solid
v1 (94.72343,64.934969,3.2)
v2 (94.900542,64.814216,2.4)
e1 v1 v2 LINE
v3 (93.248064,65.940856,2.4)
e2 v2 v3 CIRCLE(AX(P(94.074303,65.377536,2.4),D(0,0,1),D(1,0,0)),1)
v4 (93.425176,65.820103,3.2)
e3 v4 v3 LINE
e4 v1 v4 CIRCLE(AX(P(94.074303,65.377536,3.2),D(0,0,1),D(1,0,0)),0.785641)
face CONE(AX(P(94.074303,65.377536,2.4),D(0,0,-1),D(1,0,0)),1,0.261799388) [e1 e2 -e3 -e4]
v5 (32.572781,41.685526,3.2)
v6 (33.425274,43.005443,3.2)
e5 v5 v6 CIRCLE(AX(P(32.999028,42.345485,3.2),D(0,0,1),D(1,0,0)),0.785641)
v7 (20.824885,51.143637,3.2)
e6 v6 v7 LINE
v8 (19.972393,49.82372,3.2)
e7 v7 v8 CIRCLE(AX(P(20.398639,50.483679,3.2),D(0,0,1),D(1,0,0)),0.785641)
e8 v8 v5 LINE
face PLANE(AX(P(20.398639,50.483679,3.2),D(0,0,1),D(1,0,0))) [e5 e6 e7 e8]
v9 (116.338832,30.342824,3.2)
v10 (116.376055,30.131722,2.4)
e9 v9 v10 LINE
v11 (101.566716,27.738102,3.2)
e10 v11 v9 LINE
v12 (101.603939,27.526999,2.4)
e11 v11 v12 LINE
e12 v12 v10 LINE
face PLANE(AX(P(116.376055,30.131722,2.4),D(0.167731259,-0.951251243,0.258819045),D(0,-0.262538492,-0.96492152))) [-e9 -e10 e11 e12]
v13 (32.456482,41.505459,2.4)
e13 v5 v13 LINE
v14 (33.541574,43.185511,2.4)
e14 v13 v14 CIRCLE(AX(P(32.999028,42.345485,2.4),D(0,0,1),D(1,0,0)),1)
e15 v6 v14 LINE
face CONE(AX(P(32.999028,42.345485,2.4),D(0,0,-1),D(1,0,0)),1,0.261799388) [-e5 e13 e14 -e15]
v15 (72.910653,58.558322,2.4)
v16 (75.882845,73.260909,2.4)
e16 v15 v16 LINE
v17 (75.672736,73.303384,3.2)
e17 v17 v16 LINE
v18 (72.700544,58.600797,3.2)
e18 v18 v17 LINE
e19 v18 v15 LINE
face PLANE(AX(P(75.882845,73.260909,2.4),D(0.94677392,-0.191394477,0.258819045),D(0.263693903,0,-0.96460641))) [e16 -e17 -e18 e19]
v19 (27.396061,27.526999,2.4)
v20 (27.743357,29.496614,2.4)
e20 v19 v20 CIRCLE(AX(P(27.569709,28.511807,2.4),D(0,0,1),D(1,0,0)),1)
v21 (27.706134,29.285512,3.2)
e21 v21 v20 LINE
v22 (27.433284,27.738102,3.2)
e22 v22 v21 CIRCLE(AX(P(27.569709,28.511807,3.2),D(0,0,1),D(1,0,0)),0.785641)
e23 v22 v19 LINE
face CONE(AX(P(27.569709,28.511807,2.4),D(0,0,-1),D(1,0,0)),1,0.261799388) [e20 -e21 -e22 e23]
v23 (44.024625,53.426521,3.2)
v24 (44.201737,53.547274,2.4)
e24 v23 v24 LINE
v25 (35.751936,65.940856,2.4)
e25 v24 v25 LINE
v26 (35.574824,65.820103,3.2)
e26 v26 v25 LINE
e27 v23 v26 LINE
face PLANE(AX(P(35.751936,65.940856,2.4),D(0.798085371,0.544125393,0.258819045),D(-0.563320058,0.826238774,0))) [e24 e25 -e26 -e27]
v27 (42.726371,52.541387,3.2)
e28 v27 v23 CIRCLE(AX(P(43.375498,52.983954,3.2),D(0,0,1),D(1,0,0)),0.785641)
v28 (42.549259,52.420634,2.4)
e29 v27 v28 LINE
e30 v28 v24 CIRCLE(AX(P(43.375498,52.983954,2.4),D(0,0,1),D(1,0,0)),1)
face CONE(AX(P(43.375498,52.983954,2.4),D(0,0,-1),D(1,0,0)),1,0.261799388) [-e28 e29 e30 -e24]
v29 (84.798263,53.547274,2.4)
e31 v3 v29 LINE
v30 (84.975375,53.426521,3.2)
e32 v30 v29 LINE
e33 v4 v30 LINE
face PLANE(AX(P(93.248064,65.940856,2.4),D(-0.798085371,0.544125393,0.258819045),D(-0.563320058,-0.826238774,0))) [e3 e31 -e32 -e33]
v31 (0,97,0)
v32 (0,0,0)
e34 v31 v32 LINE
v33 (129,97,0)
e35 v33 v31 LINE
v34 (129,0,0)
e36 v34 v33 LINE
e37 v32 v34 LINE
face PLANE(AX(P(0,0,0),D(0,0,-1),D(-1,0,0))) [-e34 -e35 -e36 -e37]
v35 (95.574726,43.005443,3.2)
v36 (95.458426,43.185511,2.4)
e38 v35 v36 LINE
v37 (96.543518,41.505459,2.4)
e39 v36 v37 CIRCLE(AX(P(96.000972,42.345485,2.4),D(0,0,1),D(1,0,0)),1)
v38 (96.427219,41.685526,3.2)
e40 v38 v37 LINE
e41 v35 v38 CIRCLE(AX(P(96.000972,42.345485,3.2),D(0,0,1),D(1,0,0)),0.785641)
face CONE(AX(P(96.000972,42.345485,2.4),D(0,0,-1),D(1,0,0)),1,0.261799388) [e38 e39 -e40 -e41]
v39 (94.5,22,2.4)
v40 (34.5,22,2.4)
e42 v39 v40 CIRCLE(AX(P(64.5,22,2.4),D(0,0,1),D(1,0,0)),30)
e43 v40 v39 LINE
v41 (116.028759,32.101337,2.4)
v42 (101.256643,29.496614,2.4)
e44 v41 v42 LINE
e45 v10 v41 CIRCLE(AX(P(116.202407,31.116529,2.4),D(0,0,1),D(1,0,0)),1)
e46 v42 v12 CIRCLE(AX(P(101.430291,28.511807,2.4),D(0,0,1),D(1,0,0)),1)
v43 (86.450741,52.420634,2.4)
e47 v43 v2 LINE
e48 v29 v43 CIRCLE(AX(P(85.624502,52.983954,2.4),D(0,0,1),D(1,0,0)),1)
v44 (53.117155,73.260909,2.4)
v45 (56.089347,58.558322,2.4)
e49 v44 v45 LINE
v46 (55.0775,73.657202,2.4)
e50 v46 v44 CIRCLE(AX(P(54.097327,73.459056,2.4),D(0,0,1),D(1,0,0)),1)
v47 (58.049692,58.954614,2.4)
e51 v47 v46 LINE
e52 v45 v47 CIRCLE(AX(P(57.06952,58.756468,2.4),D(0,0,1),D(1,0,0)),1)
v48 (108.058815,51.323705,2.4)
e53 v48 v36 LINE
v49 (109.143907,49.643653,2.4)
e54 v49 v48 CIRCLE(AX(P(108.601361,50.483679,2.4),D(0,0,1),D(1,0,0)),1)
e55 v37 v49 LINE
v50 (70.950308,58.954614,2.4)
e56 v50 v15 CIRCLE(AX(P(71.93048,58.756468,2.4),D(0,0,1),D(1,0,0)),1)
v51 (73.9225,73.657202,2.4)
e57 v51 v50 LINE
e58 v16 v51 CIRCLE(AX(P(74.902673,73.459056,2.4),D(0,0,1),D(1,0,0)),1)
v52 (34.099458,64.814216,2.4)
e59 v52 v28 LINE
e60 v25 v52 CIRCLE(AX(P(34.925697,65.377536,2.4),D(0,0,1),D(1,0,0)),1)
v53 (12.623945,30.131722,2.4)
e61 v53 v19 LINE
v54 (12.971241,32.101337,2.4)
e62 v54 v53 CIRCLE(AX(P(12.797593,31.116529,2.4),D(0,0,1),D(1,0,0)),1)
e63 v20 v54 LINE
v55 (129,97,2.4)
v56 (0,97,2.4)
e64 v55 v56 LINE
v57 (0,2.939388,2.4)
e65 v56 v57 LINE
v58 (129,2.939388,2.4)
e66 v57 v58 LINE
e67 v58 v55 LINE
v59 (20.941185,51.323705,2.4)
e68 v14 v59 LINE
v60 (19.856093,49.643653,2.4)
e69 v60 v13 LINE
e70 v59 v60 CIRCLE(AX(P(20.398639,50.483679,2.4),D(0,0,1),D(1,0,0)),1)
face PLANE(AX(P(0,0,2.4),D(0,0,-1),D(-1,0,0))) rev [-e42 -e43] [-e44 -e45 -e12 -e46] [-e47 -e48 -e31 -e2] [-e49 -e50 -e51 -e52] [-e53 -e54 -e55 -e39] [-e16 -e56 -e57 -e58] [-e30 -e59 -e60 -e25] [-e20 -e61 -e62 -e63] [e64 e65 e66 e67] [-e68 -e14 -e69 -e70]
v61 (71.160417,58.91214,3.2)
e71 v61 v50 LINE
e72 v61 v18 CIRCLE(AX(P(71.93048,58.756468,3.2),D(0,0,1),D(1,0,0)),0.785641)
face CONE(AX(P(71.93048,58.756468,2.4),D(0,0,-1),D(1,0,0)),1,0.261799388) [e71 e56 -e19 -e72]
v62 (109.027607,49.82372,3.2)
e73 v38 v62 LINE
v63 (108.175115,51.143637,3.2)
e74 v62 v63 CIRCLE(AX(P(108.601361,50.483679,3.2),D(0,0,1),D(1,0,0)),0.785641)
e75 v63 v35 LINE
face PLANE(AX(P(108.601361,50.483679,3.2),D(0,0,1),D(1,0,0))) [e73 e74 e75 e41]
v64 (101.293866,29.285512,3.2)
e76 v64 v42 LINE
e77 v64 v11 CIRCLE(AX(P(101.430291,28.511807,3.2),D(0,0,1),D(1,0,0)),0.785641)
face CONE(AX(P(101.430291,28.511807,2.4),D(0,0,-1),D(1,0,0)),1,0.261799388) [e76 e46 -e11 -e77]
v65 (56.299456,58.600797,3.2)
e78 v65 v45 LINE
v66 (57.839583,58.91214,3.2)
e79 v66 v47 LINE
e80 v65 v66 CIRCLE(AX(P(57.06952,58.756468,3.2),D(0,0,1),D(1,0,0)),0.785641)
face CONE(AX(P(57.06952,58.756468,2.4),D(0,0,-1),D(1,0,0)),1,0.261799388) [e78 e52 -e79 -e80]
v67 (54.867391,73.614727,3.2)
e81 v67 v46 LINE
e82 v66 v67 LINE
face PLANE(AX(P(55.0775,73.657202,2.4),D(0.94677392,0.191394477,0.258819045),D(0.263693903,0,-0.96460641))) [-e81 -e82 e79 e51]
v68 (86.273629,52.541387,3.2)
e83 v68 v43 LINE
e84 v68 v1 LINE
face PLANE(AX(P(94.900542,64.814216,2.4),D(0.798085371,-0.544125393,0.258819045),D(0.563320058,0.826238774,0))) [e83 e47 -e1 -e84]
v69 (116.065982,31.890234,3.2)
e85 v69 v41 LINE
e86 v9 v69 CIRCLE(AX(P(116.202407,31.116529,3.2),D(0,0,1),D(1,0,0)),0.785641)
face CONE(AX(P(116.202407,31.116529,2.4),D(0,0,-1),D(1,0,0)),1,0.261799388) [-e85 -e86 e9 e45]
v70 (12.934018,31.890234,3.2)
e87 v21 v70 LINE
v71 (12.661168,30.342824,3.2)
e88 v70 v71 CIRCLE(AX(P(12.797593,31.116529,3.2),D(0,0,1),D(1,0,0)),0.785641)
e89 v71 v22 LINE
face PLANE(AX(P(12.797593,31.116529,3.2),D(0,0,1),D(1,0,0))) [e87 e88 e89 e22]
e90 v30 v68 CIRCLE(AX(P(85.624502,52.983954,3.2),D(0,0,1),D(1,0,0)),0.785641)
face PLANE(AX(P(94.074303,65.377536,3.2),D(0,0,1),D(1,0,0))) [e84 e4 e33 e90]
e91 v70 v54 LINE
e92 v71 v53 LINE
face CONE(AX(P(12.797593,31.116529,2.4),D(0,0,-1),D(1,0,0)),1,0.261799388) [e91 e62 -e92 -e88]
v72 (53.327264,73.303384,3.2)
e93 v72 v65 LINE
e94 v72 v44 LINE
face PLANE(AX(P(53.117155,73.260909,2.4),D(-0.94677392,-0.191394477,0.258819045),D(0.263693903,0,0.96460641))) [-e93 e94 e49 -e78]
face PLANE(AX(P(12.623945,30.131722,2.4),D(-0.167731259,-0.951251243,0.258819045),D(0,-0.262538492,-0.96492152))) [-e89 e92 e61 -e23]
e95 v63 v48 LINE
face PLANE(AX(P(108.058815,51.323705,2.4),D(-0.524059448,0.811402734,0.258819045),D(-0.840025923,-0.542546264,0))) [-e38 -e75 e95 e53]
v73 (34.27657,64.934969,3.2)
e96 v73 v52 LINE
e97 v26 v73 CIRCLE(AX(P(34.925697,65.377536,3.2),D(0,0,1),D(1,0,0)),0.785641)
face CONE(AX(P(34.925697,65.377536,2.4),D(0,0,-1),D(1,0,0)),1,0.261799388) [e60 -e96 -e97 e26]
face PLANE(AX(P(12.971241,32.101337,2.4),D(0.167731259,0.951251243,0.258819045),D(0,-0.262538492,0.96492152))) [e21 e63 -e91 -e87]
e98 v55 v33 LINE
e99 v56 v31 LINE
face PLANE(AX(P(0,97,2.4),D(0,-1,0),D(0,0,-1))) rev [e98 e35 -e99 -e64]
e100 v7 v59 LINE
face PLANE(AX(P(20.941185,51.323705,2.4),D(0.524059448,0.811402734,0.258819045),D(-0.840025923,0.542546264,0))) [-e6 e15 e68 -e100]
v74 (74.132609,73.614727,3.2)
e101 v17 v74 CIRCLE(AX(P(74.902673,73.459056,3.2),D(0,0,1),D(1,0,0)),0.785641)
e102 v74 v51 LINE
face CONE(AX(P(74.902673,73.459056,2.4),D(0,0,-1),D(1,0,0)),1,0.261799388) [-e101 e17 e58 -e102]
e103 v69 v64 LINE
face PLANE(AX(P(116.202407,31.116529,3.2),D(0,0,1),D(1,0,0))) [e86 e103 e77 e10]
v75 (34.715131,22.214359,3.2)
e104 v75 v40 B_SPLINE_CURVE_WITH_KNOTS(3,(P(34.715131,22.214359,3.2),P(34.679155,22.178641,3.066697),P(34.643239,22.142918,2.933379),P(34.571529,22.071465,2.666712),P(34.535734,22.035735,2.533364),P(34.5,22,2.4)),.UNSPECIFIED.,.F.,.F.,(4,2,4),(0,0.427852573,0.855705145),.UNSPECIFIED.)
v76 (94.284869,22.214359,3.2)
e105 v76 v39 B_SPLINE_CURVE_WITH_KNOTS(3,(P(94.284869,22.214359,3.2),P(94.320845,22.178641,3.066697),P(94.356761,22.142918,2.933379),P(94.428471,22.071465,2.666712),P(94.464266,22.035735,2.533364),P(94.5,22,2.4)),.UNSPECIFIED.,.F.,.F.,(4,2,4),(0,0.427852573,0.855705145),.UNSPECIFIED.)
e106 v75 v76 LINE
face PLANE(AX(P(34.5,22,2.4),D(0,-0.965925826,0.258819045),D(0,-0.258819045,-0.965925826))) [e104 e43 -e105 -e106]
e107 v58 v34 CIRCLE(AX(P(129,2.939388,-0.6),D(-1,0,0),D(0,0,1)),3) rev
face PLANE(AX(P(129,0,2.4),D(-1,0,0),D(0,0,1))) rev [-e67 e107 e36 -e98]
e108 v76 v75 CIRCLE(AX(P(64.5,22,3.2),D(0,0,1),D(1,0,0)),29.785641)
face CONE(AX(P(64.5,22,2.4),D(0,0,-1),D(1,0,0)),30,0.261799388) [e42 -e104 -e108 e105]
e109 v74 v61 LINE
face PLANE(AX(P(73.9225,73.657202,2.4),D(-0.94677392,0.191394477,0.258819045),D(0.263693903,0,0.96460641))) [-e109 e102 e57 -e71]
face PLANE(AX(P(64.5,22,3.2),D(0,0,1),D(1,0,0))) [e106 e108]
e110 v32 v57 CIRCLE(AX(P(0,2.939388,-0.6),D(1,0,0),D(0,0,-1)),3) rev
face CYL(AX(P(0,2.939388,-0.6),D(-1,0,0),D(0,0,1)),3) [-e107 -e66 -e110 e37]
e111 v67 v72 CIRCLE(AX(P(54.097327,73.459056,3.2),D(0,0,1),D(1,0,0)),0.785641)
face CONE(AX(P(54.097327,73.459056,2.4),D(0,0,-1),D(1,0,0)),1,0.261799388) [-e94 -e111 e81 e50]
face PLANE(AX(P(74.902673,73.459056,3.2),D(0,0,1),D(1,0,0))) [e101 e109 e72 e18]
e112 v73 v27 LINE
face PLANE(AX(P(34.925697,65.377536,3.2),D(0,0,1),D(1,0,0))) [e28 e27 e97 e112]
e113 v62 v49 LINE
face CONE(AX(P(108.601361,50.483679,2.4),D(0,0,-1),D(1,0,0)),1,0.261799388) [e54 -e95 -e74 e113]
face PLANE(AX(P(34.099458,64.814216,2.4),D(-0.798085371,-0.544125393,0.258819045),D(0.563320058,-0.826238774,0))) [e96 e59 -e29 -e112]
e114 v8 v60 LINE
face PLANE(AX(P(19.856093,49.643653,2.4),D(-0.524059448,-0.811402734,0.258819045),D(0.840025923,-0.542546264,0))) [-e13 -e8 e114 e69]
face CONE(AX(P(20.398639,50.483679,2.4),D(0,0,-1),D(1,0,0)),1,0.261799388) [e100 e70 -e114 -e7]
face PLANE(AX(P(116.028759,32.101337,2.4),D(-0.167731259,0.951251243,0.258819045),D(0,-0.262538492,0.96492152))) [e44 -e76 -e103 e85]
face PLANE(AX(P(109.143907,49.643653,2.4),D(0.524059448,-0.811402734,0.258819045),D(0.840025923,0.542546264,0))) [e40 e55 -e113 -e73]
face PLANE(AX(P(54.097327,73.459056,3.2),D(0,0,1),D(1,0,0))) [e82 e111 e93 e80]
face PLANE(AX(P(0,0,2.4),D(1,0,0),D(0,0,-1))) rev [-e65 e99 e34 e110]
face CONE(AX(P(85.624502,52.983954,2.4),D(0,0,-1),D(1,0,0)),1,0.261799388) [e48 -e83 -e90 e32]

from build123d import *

# Parameters (mm, degrees)
SKETCH1_W                     = 129
SKETCH1_H                     = 97
BOSS_EXTRUDE1_DEPTH           = 2.4
FILLET1_R                     = 3
BOSS_EXTRUDE2_DEPTH           = 0.8
BOSS_EXTRUDE2_DRAFT           = 15
BOSS_EXTRUDE2_PROFILE_2_DEPTH = 0.8
BOSS_EXTRUDE2_PROFILE_2_DRAFT = 15
BOSS_EXTRUDE2_PROFILE_3_DEPTH = 0.8
BOSS_EXTRUDE2_PROFILE_3_DRAFT = 15
BOSS_EXTRUDE2_PROFILE_4_DEPTH = 0.8
BOSS_EXTRUDE2_PROFILE_4_DRAFT = 15
BOSS_EXTRUDE2_PROFILE_5_DEPTH = 0.8
BOSS_EXTRUDE2_PROFILE_5_DRAFT = 15
BOSS_EXTRUDE2_PROFILE_6_DEPTH = 0.8
BOSS_EXTRUDE2_PROFILE_6_DRAFT = 15
BOSS_EXTRUDE2_PROFILE_7_DEPTH = 0.8
BOSS_EXTRUDE2_PROFILE_7_DRAFT = 15
BOSS_EXTRUDE2_PROFILE_8_DEPTH = 0.8
BOSS_EXTRUDE2_PROFILE_8_DRAFT = 15
BOSS_EXTRUDE2_PROFILE_9_DEPTH = 0.8
BOSS_EXTRUDE2_PROFILE_9_DRAFT = 15


with BuildPart() as part:
    # Sketch1 → Boss-Extrude1 (new body)
    with BuildSketch(Plane.XY):
        with Locations((64.5, 48.5)):
            Rectangle(SKETCH1_W, SKETCH1_H)
    extrude(amount=BOSS_EXTRUDE1_DEPTH)

    # Fillet1
    # the kernel refuses this fillet: 3 mm, written as the material it takes off along each edge
    with BuildSketch(Plane(origin=(-7.348469228, 0, 2.4), x_dir=(0, 1.5674498735994488e-12, -1.0), z_dir=(1, 0, 0))) as fillet1_piece_1:
        with BuildLine():
            CenterArc((3, 2.939387691), FILLET1_R, 180, 78.463040967)
            Line((0, 2.939387691), (-0.06, 2.939387691))
            Line((-0.06, 2.939387691), (-0.06, 0))
            Line((-0.06, 0), (0, -0.06))
            ThreePointArc((0, -0.06), (1.2, -0.06), (2.388, -0.058787754))
            Line((2.388, -0.058787754), (2.4, 0))
        make_face()
    extrude(amount=143.696938457, mode=Mode.SUBTRACT)


with BuildPart() as boss_extrude2_tool:
    # Sketch2 → Boss-Extrude2 (with draft: the straight prism first)
    with BuildSketch(Plane.XY.offset(2.4)):
        with BuildLine():
            Line((34.5, 22), (94.5, 22))
            ThreePointArc((94.5, 22), (64.5, 52), (34.5, 22))
        make_face()
    extrude(amount=BOSS_EXTRUDE2_DEPTH)
    # Boss-Extrude2: the draft: its side faces are tilted about the plane it starts from
    boss_extrude2_sides = [boss_extrude2_tool.faces().sort_by_distance(p)[0] for p in [
        (64.5, 22, 2.8),
        (64.5, 52, 2.8),
    ]]
    draft(boss_extrude2_sides, Plane.XY.offset(2.4), BOSS_EXTRUDE2_DRAFT)


with BuildPart() as part_1:
    add(part.part)

    # Boss-Extrude2: add boss_extrude2_tool
    add(boss_extrude2_tool.part)


with BuildPart() as boss_extrude2_profile_2_tool:
    # Sketch2 → Boss-Extrude2 profile 2 (with draft: the straight prism first)
    with BuildSketch(Plane.XY.offset(2.4)):
        with BuildLine():
            ThreePointArc((12.971241145, 32.101337081), (11.812785214, 31.290177505), (12.623944789, 30.131721575))
            Line((12.623944789, 30.131721575), (27.396061084, 27.526998909))
            ThreePointArc((27.396061084, 27.526998909), (28.554517015, 28.338158485), (27.74335744, 29.496614416))
            Line((27.74335744, 29.496614416), (12.971241145, 32.101337081))
        make_face()
    extrude(amount=BOSS_EXTRUDE2_PROFILE_2_DEPTH)
    # Boss-Extrude2 profile 2: the draft: its side faces are tilted about the plane it starts from
    boss_extrude2_profile_2_sides = [boss_extrude2_profile_2_tool.faces().sort_by_distance(p)[0] for p in [
        (11.812785214, 31.290177505, 2.8),
        (20.010002937, 28.829360242, 2.8),
        (28.554517015, 28.338158485, 2.8),
        (20.357299292, 30.798975748, 2.8),
    ]]
    draft(boss_extrude2_profile_2_sides, Plane.XY.offset(2.4), BOSS_EXTRUDE2_PROFILE_2_DRAFT)


with BuildPart() as part_2:
    add(part_1.part)

    # Boss-Extrude2 profile 2: add boss_extrude2_profile_2_tool
    add(boss_extrude2_profile_2_tool.part)


with BuildPart() as boss_extrude2_profile_3_tool:
    # Sketch2 → Boss-Extrude2 profile 3 (with draft: the straight prism first)
    with BuildSketch(Plane.XY.offset(2.4)):
        with BuildLine():
            ThreePointArc((20.941185298, 51.323704776), (19.558613111, 51.026225117), (19.856092771, 49.64365293))
            Line((19.856092771, 49.64365293), (32.456481618, 41.505458972))
            ThreePointArc((32.456481618, 41.505458972), (33.839053805, 41.802938631), (33.541574146, 43.185510818))
            Line((33.541574146, 43.185510818), (20.941185298, 51.323704776))
        make_face()
    extrude(amount=BOSS_EXTRUDE2_PROFILE_3_DEPTH)
    # Boss-Extrude2 profile 3: the draft: its side faces are tilted about the plane it starts from
    boss_extrude2_profile_3_sides = [boss_extrude2_profile_3_tool.faces().sort_by_distance(p)[0] for p in [
        (33.839053805, 41.802938631, 2.8),
        (27.241379722, 47.254607797, 2.8),
        (19.558613111, 51.026225117, 2.8),
        (26.156287194, 45.574555951, 2.8),
    ]]
    draft(boss_extrude2_profile_3_sides, Plane.XY.offset(2.4), BOSS_EXTRUDE2_PROFILE_3_DRAFT)


with BuildPart() as part_3:
    add(part_2.part)

    # Boss-Extrude2 profile 3: add boss_extrude2_profile_3_tool
    add(boss_extrude2_profile_3_tool.part)


with BuildPart() as boss_extrude2_profile_4_tool:
    # Sketch2 → Boss-Extrude2 profile 4 (with draft: the straight prism first)
    with BuildSketch(Plane.XY.offset(2.4)):
        with BuildLine():
            ThreePointArc((35.751935726, 65.94085571), (34.362376894, 66.203774426), (34.099458177, 64.814215594))
            Line((34.099458177, 64.814215594), (42.549259048, 52.420633979))
            ThreePointArc((42.549259048, 52.420633979), (43.938817881, 52.157715263), (44.201736597, 53.547274095))
            Line((44.201736597, 53.547274095), (35.751935726, 65.94085571))
        make_face()
    extrude(amount=BOSS_EXTRUDE2_PROFILE_4_DEPTH)
    # Boss-Extrude2 profile 4: the draft: its side faces are tilted about the plane it starts from
    boss_extrude2_profile_4_sides = [boss_extrude2_profile_4_tool.faces().sort_by_distance(p)[0] for p in [
        (38.324358613, 58.617424786, 2.8),
        (43.938817881, 52.157715263, 2.8),
        (39.976836161, 59.744064902, 2.8),
        (34.362376894, 66.203774426, 2.8),
    ]]
    draft(boss_extrude2_profile_4_sides, Plane.XY.offset(2.4), BOSS_EXTRUDE2_PROFILE_4_DRAFT)


with BuildPart() as part_4:
    add(part_3.part)

    # Boss-Extrude2 profile 4: add boss_extrude2_profile_4_tool
    add(boss_extrude2_profile_4_tool.part)


with BuildPart() as boss_extrude2_profile_5_tool:
    # Sketch2 → Boss-Extrude2 profile 5 (with draft: the straight prism first)
    with BuildSketch(Plane.XY.offset(2.4)):
        with BuildLine():
            ThreePointArc((55.07749997, 73.657201755), (53.899181339, 74.4392281), (53.117154994, 73.260909469))
            Line((53.117154994, 73.260909469), (56.089347142, 58.558322151))
            ThreePointArc((56.089347142, 58.558322151), (57.267665773, 57.776295806), (58.049692118, 58.954614438))
            Line((58.049692118, 58.954614438), (55.07749997, 73.657201755))
        make_face()
    extrude(amount=BOSS_EXTRUDE2_PROFILE_5_DEPTH)
    # Boss-Extrude2 profile 5: the draft: its side faces are tilted about the plane it starts from
    boss_extrude2_profile_5_sides = [boss_extrude2_profile_5_tool.faces().sort_by_distance(p)[0] for p in [
        (53.899181339, 74.4392281, 2.8),
        (54.603251068, 65.90961581, 2.8),
        (57.267665773, 57.776295806, 2.8),
        (56.563596044, 66.305908096, 2.8),
    ]]
    draft(boss_extrude2_profile_5_sides, Plane.XY.offset(2.4), BOSS_EXTRUDE2_PROFILE_5_DRAFT)


with BuildPart() as part_5:
    add(part_4.part)

    # Boss-Extrude2 profile 5: add boss_extrude2_profile_5_tool
    add(boss_extrude2_profile_5_tool.part)


with BuildPart() as boss_extrude2_profile_6_tool:
    # Sketch2 → Boss-Extrude2 profile 6 (with draft: the straight prism first)
    with BuildSketch(Plane.XY.offset(2.4)):
        with BuildLine():
            ThreePointArc((75.882845006, 73.260909469), (75.100818661, 74.4392281), (73.92250003, 73.657201755))
            Line((73.92250003, 73.657201755), (70.950307882, 58.954614438))
            ThreePointArc((70.950307882, 58.954614438), (71.732334227, 57.776295806), (72.910652858, 58.558322151))
            Line((72.910652858, 58.558322151), (75.882845006, 73.260909469))
        make_face()
    extrude(amount=BOSS_EXTRUDE2_PROFILE_6_DEPTH)
    # Boss-Extrude2 profile 6: the draft: its side faces are tilted about the plane it starts from
    boss_extrude2_profile_6_sides = [boss_extrude2_profile_6_tool.faces().sort_by_distance(p)[0] for p in [
        (75.100818661, 74.4392281, 2.8),
        (72.436403956, 66.305908096, 2.8),
        (71.732334227, 57.776295806, 2.8),
        (74.396748932, 65.90961581, 2.8),
    ]]
    draft(boss_extrude2_profile_6_sides, Plane.XY.offset(2.4), BOSS_EXTRUDE2_PROFILE_6_DRAFT)


with BuildPart() as part_6:
    add(part_5.part)

    # Boss-Extrude2 profile 6: add boss_extrude2_profile_6_tool
    add(boss_extrude2_profile_6_tool.part)


with BuildPart() as boss_extrude2_profile_7_tool:
    # Sketch2 → Boss-Extrude2 profile 7 (with draft: the straight prism first)
    with BuildSketch(Plane.XY.offset(2.4)):
        with BuildLine():
            ThreePointArc((94.900541823, 64.814215594), (94.637623106, 66.203774426), (93.248064274, 65.94085571))
            Line((93.248064274, 65.94085571), (84.798263403, 53.547274095))
            ThreePointArc((84.798263403, 53.547274095), (85.061182119, 52.157715263), (86.450740952, 52.420633979))
            Line((86.450740952, 52.420633979), (94.900541823, 64.814215594))
        make_face()
    extrude(amount=BOSS_EXTRUDE2_PROFILE_7_DEPTH)
    # Boss-Extrude2 profile 7: the draft: its side faces are tilted about the plane it starts from
    boss_extrude2_profile_7_sides = [boss_extrude2_profile_7_tool.faces().sort_by_distance(p)[0] for p in [
        (94.637623106, 66.203774426, 2.8),
        (89.023163839, 59.744064902, 2.8),
        (85.061182119, 52.157715263, 2.8),
        (90.675641387, 58.617424786, 2.8),
    ]]
    draft(boss_extrude2_profile_7_sides, Plane.XY.offset(2.4), BOSS_EXTRUDE2_PROFILE_7_DRAFT)


with BuildPart() as part_7:
    add(part_6.part)

    # Boss-Extrude2 profile 7: add boss_extrude2_profile_7_tool
    add(boss_extrude2_profile_7_tool.part)


with BuildPart() as boss_extrude2_profile_8_tool:
    # Sketch2 → Boss-Extrude2 profile 8 (with draft: the straight prism first)
    with BuildSketch(Plane.XY.offset(2.4)):
        with BuildLine():
            ThreePointArc((109.143907229, 49.64365293), (109.441386889, 51.026225117), (108.058814702, 51.323704776))
            Line((108.058814702, 51.323704776), (95.458425854, 43.185510818))
            ThreePointArc((95.458425854, 43.185510818), (95.160946195, 41.802938631), (96.543518382, 41.505458972))
            Line((96.543518382, 41.505458972), (109.143907229, 49.64365293))
        make_face()
    extrude(amount=BOSS_EXTRUDE2_PROFILE_8_DEPTH)
    # Boss-Extrude2 profile 8: the draft: its side faces are tilted about the plane it starts from
    boss_extrude2_profile_8_sides = [boss_extrude2_profile_8_tool.faces().sort_by_distance(p)[0] for p in [
        (102.843712806, 45.574555951, 2.8),
        (109.441386889, 51.026225117, 2.8),
        (101.758620278, 47.254607797, 2.8),
        (95.160946195, 41.802938631, 2.8),
    ]]
    draft(boss_extrude2_profile_8_sides, Plane.XY.offset(2.4), BOSS_EXTRUDE2_PROFILE_8_DRAFT)


with BuildPart() as part_8:
    add(part_7.part)

    # Boss-Extrude2 profile 8: add boss_extrude2_profile_8_tool
    add(boss_extrude2_profile_8_tool.part)


with BuildPart() as boss_extrude2_profile_9_tool:
    # Sketch2 → Boss-Extrude2 profile 9 (with draft: the straight prism first)
    with BuildSketch(Plane.XY.offset(2.4)):
        with BuildLine():
            ThreePointArc((116.376055211, 30.131721575), (117.187214786, 31.290177505), (116.028758855, 32.101337081))
            Line((116.028758855, 32.101337081), (101.25664256, 29.496614416))
            ThreePointArc((101.25664256, 29.496614416), (100.445482985, 28.338158485), (101.603938916, 27.526998909))
            Line((101.603938916, 27.526998909), (116.376055211, 30.131721575))
        make_face()
    extrude(amount=BOSS_EXTRUDE2_PROFILE_9_DEPTH)
    # Boss-Extrude2 profile 9: the draft: its side faces are tilted about the plane it starts from
    boss_extrude2_profile_9_sides = [boss_extrude2_profile_9_tool.faces().sort_by_distance(p)[0] for p in [
        (108.642700708, 30.798975748, 2.8),
        (100.445482985, 28.338158485, 2.8),
        (108.989997063, 28.829360242, 2.8),
        (117.187214786, 31.290177505, 2.8),
    ]]
    draft(boss_extrude2_profile_9_sides, Plane.XY.offset(2.4), BOSS_EXTRUDE2_PROFILE_9_DRAFT)


with BuildPart() as part_9:
    add(part_8.part)

    # Boss-Extrude2 profile 9: add boss_extrude2_profile_9_tool
    add(boss_extrude2_profile_9_tool.part)


solid = part_9.part
